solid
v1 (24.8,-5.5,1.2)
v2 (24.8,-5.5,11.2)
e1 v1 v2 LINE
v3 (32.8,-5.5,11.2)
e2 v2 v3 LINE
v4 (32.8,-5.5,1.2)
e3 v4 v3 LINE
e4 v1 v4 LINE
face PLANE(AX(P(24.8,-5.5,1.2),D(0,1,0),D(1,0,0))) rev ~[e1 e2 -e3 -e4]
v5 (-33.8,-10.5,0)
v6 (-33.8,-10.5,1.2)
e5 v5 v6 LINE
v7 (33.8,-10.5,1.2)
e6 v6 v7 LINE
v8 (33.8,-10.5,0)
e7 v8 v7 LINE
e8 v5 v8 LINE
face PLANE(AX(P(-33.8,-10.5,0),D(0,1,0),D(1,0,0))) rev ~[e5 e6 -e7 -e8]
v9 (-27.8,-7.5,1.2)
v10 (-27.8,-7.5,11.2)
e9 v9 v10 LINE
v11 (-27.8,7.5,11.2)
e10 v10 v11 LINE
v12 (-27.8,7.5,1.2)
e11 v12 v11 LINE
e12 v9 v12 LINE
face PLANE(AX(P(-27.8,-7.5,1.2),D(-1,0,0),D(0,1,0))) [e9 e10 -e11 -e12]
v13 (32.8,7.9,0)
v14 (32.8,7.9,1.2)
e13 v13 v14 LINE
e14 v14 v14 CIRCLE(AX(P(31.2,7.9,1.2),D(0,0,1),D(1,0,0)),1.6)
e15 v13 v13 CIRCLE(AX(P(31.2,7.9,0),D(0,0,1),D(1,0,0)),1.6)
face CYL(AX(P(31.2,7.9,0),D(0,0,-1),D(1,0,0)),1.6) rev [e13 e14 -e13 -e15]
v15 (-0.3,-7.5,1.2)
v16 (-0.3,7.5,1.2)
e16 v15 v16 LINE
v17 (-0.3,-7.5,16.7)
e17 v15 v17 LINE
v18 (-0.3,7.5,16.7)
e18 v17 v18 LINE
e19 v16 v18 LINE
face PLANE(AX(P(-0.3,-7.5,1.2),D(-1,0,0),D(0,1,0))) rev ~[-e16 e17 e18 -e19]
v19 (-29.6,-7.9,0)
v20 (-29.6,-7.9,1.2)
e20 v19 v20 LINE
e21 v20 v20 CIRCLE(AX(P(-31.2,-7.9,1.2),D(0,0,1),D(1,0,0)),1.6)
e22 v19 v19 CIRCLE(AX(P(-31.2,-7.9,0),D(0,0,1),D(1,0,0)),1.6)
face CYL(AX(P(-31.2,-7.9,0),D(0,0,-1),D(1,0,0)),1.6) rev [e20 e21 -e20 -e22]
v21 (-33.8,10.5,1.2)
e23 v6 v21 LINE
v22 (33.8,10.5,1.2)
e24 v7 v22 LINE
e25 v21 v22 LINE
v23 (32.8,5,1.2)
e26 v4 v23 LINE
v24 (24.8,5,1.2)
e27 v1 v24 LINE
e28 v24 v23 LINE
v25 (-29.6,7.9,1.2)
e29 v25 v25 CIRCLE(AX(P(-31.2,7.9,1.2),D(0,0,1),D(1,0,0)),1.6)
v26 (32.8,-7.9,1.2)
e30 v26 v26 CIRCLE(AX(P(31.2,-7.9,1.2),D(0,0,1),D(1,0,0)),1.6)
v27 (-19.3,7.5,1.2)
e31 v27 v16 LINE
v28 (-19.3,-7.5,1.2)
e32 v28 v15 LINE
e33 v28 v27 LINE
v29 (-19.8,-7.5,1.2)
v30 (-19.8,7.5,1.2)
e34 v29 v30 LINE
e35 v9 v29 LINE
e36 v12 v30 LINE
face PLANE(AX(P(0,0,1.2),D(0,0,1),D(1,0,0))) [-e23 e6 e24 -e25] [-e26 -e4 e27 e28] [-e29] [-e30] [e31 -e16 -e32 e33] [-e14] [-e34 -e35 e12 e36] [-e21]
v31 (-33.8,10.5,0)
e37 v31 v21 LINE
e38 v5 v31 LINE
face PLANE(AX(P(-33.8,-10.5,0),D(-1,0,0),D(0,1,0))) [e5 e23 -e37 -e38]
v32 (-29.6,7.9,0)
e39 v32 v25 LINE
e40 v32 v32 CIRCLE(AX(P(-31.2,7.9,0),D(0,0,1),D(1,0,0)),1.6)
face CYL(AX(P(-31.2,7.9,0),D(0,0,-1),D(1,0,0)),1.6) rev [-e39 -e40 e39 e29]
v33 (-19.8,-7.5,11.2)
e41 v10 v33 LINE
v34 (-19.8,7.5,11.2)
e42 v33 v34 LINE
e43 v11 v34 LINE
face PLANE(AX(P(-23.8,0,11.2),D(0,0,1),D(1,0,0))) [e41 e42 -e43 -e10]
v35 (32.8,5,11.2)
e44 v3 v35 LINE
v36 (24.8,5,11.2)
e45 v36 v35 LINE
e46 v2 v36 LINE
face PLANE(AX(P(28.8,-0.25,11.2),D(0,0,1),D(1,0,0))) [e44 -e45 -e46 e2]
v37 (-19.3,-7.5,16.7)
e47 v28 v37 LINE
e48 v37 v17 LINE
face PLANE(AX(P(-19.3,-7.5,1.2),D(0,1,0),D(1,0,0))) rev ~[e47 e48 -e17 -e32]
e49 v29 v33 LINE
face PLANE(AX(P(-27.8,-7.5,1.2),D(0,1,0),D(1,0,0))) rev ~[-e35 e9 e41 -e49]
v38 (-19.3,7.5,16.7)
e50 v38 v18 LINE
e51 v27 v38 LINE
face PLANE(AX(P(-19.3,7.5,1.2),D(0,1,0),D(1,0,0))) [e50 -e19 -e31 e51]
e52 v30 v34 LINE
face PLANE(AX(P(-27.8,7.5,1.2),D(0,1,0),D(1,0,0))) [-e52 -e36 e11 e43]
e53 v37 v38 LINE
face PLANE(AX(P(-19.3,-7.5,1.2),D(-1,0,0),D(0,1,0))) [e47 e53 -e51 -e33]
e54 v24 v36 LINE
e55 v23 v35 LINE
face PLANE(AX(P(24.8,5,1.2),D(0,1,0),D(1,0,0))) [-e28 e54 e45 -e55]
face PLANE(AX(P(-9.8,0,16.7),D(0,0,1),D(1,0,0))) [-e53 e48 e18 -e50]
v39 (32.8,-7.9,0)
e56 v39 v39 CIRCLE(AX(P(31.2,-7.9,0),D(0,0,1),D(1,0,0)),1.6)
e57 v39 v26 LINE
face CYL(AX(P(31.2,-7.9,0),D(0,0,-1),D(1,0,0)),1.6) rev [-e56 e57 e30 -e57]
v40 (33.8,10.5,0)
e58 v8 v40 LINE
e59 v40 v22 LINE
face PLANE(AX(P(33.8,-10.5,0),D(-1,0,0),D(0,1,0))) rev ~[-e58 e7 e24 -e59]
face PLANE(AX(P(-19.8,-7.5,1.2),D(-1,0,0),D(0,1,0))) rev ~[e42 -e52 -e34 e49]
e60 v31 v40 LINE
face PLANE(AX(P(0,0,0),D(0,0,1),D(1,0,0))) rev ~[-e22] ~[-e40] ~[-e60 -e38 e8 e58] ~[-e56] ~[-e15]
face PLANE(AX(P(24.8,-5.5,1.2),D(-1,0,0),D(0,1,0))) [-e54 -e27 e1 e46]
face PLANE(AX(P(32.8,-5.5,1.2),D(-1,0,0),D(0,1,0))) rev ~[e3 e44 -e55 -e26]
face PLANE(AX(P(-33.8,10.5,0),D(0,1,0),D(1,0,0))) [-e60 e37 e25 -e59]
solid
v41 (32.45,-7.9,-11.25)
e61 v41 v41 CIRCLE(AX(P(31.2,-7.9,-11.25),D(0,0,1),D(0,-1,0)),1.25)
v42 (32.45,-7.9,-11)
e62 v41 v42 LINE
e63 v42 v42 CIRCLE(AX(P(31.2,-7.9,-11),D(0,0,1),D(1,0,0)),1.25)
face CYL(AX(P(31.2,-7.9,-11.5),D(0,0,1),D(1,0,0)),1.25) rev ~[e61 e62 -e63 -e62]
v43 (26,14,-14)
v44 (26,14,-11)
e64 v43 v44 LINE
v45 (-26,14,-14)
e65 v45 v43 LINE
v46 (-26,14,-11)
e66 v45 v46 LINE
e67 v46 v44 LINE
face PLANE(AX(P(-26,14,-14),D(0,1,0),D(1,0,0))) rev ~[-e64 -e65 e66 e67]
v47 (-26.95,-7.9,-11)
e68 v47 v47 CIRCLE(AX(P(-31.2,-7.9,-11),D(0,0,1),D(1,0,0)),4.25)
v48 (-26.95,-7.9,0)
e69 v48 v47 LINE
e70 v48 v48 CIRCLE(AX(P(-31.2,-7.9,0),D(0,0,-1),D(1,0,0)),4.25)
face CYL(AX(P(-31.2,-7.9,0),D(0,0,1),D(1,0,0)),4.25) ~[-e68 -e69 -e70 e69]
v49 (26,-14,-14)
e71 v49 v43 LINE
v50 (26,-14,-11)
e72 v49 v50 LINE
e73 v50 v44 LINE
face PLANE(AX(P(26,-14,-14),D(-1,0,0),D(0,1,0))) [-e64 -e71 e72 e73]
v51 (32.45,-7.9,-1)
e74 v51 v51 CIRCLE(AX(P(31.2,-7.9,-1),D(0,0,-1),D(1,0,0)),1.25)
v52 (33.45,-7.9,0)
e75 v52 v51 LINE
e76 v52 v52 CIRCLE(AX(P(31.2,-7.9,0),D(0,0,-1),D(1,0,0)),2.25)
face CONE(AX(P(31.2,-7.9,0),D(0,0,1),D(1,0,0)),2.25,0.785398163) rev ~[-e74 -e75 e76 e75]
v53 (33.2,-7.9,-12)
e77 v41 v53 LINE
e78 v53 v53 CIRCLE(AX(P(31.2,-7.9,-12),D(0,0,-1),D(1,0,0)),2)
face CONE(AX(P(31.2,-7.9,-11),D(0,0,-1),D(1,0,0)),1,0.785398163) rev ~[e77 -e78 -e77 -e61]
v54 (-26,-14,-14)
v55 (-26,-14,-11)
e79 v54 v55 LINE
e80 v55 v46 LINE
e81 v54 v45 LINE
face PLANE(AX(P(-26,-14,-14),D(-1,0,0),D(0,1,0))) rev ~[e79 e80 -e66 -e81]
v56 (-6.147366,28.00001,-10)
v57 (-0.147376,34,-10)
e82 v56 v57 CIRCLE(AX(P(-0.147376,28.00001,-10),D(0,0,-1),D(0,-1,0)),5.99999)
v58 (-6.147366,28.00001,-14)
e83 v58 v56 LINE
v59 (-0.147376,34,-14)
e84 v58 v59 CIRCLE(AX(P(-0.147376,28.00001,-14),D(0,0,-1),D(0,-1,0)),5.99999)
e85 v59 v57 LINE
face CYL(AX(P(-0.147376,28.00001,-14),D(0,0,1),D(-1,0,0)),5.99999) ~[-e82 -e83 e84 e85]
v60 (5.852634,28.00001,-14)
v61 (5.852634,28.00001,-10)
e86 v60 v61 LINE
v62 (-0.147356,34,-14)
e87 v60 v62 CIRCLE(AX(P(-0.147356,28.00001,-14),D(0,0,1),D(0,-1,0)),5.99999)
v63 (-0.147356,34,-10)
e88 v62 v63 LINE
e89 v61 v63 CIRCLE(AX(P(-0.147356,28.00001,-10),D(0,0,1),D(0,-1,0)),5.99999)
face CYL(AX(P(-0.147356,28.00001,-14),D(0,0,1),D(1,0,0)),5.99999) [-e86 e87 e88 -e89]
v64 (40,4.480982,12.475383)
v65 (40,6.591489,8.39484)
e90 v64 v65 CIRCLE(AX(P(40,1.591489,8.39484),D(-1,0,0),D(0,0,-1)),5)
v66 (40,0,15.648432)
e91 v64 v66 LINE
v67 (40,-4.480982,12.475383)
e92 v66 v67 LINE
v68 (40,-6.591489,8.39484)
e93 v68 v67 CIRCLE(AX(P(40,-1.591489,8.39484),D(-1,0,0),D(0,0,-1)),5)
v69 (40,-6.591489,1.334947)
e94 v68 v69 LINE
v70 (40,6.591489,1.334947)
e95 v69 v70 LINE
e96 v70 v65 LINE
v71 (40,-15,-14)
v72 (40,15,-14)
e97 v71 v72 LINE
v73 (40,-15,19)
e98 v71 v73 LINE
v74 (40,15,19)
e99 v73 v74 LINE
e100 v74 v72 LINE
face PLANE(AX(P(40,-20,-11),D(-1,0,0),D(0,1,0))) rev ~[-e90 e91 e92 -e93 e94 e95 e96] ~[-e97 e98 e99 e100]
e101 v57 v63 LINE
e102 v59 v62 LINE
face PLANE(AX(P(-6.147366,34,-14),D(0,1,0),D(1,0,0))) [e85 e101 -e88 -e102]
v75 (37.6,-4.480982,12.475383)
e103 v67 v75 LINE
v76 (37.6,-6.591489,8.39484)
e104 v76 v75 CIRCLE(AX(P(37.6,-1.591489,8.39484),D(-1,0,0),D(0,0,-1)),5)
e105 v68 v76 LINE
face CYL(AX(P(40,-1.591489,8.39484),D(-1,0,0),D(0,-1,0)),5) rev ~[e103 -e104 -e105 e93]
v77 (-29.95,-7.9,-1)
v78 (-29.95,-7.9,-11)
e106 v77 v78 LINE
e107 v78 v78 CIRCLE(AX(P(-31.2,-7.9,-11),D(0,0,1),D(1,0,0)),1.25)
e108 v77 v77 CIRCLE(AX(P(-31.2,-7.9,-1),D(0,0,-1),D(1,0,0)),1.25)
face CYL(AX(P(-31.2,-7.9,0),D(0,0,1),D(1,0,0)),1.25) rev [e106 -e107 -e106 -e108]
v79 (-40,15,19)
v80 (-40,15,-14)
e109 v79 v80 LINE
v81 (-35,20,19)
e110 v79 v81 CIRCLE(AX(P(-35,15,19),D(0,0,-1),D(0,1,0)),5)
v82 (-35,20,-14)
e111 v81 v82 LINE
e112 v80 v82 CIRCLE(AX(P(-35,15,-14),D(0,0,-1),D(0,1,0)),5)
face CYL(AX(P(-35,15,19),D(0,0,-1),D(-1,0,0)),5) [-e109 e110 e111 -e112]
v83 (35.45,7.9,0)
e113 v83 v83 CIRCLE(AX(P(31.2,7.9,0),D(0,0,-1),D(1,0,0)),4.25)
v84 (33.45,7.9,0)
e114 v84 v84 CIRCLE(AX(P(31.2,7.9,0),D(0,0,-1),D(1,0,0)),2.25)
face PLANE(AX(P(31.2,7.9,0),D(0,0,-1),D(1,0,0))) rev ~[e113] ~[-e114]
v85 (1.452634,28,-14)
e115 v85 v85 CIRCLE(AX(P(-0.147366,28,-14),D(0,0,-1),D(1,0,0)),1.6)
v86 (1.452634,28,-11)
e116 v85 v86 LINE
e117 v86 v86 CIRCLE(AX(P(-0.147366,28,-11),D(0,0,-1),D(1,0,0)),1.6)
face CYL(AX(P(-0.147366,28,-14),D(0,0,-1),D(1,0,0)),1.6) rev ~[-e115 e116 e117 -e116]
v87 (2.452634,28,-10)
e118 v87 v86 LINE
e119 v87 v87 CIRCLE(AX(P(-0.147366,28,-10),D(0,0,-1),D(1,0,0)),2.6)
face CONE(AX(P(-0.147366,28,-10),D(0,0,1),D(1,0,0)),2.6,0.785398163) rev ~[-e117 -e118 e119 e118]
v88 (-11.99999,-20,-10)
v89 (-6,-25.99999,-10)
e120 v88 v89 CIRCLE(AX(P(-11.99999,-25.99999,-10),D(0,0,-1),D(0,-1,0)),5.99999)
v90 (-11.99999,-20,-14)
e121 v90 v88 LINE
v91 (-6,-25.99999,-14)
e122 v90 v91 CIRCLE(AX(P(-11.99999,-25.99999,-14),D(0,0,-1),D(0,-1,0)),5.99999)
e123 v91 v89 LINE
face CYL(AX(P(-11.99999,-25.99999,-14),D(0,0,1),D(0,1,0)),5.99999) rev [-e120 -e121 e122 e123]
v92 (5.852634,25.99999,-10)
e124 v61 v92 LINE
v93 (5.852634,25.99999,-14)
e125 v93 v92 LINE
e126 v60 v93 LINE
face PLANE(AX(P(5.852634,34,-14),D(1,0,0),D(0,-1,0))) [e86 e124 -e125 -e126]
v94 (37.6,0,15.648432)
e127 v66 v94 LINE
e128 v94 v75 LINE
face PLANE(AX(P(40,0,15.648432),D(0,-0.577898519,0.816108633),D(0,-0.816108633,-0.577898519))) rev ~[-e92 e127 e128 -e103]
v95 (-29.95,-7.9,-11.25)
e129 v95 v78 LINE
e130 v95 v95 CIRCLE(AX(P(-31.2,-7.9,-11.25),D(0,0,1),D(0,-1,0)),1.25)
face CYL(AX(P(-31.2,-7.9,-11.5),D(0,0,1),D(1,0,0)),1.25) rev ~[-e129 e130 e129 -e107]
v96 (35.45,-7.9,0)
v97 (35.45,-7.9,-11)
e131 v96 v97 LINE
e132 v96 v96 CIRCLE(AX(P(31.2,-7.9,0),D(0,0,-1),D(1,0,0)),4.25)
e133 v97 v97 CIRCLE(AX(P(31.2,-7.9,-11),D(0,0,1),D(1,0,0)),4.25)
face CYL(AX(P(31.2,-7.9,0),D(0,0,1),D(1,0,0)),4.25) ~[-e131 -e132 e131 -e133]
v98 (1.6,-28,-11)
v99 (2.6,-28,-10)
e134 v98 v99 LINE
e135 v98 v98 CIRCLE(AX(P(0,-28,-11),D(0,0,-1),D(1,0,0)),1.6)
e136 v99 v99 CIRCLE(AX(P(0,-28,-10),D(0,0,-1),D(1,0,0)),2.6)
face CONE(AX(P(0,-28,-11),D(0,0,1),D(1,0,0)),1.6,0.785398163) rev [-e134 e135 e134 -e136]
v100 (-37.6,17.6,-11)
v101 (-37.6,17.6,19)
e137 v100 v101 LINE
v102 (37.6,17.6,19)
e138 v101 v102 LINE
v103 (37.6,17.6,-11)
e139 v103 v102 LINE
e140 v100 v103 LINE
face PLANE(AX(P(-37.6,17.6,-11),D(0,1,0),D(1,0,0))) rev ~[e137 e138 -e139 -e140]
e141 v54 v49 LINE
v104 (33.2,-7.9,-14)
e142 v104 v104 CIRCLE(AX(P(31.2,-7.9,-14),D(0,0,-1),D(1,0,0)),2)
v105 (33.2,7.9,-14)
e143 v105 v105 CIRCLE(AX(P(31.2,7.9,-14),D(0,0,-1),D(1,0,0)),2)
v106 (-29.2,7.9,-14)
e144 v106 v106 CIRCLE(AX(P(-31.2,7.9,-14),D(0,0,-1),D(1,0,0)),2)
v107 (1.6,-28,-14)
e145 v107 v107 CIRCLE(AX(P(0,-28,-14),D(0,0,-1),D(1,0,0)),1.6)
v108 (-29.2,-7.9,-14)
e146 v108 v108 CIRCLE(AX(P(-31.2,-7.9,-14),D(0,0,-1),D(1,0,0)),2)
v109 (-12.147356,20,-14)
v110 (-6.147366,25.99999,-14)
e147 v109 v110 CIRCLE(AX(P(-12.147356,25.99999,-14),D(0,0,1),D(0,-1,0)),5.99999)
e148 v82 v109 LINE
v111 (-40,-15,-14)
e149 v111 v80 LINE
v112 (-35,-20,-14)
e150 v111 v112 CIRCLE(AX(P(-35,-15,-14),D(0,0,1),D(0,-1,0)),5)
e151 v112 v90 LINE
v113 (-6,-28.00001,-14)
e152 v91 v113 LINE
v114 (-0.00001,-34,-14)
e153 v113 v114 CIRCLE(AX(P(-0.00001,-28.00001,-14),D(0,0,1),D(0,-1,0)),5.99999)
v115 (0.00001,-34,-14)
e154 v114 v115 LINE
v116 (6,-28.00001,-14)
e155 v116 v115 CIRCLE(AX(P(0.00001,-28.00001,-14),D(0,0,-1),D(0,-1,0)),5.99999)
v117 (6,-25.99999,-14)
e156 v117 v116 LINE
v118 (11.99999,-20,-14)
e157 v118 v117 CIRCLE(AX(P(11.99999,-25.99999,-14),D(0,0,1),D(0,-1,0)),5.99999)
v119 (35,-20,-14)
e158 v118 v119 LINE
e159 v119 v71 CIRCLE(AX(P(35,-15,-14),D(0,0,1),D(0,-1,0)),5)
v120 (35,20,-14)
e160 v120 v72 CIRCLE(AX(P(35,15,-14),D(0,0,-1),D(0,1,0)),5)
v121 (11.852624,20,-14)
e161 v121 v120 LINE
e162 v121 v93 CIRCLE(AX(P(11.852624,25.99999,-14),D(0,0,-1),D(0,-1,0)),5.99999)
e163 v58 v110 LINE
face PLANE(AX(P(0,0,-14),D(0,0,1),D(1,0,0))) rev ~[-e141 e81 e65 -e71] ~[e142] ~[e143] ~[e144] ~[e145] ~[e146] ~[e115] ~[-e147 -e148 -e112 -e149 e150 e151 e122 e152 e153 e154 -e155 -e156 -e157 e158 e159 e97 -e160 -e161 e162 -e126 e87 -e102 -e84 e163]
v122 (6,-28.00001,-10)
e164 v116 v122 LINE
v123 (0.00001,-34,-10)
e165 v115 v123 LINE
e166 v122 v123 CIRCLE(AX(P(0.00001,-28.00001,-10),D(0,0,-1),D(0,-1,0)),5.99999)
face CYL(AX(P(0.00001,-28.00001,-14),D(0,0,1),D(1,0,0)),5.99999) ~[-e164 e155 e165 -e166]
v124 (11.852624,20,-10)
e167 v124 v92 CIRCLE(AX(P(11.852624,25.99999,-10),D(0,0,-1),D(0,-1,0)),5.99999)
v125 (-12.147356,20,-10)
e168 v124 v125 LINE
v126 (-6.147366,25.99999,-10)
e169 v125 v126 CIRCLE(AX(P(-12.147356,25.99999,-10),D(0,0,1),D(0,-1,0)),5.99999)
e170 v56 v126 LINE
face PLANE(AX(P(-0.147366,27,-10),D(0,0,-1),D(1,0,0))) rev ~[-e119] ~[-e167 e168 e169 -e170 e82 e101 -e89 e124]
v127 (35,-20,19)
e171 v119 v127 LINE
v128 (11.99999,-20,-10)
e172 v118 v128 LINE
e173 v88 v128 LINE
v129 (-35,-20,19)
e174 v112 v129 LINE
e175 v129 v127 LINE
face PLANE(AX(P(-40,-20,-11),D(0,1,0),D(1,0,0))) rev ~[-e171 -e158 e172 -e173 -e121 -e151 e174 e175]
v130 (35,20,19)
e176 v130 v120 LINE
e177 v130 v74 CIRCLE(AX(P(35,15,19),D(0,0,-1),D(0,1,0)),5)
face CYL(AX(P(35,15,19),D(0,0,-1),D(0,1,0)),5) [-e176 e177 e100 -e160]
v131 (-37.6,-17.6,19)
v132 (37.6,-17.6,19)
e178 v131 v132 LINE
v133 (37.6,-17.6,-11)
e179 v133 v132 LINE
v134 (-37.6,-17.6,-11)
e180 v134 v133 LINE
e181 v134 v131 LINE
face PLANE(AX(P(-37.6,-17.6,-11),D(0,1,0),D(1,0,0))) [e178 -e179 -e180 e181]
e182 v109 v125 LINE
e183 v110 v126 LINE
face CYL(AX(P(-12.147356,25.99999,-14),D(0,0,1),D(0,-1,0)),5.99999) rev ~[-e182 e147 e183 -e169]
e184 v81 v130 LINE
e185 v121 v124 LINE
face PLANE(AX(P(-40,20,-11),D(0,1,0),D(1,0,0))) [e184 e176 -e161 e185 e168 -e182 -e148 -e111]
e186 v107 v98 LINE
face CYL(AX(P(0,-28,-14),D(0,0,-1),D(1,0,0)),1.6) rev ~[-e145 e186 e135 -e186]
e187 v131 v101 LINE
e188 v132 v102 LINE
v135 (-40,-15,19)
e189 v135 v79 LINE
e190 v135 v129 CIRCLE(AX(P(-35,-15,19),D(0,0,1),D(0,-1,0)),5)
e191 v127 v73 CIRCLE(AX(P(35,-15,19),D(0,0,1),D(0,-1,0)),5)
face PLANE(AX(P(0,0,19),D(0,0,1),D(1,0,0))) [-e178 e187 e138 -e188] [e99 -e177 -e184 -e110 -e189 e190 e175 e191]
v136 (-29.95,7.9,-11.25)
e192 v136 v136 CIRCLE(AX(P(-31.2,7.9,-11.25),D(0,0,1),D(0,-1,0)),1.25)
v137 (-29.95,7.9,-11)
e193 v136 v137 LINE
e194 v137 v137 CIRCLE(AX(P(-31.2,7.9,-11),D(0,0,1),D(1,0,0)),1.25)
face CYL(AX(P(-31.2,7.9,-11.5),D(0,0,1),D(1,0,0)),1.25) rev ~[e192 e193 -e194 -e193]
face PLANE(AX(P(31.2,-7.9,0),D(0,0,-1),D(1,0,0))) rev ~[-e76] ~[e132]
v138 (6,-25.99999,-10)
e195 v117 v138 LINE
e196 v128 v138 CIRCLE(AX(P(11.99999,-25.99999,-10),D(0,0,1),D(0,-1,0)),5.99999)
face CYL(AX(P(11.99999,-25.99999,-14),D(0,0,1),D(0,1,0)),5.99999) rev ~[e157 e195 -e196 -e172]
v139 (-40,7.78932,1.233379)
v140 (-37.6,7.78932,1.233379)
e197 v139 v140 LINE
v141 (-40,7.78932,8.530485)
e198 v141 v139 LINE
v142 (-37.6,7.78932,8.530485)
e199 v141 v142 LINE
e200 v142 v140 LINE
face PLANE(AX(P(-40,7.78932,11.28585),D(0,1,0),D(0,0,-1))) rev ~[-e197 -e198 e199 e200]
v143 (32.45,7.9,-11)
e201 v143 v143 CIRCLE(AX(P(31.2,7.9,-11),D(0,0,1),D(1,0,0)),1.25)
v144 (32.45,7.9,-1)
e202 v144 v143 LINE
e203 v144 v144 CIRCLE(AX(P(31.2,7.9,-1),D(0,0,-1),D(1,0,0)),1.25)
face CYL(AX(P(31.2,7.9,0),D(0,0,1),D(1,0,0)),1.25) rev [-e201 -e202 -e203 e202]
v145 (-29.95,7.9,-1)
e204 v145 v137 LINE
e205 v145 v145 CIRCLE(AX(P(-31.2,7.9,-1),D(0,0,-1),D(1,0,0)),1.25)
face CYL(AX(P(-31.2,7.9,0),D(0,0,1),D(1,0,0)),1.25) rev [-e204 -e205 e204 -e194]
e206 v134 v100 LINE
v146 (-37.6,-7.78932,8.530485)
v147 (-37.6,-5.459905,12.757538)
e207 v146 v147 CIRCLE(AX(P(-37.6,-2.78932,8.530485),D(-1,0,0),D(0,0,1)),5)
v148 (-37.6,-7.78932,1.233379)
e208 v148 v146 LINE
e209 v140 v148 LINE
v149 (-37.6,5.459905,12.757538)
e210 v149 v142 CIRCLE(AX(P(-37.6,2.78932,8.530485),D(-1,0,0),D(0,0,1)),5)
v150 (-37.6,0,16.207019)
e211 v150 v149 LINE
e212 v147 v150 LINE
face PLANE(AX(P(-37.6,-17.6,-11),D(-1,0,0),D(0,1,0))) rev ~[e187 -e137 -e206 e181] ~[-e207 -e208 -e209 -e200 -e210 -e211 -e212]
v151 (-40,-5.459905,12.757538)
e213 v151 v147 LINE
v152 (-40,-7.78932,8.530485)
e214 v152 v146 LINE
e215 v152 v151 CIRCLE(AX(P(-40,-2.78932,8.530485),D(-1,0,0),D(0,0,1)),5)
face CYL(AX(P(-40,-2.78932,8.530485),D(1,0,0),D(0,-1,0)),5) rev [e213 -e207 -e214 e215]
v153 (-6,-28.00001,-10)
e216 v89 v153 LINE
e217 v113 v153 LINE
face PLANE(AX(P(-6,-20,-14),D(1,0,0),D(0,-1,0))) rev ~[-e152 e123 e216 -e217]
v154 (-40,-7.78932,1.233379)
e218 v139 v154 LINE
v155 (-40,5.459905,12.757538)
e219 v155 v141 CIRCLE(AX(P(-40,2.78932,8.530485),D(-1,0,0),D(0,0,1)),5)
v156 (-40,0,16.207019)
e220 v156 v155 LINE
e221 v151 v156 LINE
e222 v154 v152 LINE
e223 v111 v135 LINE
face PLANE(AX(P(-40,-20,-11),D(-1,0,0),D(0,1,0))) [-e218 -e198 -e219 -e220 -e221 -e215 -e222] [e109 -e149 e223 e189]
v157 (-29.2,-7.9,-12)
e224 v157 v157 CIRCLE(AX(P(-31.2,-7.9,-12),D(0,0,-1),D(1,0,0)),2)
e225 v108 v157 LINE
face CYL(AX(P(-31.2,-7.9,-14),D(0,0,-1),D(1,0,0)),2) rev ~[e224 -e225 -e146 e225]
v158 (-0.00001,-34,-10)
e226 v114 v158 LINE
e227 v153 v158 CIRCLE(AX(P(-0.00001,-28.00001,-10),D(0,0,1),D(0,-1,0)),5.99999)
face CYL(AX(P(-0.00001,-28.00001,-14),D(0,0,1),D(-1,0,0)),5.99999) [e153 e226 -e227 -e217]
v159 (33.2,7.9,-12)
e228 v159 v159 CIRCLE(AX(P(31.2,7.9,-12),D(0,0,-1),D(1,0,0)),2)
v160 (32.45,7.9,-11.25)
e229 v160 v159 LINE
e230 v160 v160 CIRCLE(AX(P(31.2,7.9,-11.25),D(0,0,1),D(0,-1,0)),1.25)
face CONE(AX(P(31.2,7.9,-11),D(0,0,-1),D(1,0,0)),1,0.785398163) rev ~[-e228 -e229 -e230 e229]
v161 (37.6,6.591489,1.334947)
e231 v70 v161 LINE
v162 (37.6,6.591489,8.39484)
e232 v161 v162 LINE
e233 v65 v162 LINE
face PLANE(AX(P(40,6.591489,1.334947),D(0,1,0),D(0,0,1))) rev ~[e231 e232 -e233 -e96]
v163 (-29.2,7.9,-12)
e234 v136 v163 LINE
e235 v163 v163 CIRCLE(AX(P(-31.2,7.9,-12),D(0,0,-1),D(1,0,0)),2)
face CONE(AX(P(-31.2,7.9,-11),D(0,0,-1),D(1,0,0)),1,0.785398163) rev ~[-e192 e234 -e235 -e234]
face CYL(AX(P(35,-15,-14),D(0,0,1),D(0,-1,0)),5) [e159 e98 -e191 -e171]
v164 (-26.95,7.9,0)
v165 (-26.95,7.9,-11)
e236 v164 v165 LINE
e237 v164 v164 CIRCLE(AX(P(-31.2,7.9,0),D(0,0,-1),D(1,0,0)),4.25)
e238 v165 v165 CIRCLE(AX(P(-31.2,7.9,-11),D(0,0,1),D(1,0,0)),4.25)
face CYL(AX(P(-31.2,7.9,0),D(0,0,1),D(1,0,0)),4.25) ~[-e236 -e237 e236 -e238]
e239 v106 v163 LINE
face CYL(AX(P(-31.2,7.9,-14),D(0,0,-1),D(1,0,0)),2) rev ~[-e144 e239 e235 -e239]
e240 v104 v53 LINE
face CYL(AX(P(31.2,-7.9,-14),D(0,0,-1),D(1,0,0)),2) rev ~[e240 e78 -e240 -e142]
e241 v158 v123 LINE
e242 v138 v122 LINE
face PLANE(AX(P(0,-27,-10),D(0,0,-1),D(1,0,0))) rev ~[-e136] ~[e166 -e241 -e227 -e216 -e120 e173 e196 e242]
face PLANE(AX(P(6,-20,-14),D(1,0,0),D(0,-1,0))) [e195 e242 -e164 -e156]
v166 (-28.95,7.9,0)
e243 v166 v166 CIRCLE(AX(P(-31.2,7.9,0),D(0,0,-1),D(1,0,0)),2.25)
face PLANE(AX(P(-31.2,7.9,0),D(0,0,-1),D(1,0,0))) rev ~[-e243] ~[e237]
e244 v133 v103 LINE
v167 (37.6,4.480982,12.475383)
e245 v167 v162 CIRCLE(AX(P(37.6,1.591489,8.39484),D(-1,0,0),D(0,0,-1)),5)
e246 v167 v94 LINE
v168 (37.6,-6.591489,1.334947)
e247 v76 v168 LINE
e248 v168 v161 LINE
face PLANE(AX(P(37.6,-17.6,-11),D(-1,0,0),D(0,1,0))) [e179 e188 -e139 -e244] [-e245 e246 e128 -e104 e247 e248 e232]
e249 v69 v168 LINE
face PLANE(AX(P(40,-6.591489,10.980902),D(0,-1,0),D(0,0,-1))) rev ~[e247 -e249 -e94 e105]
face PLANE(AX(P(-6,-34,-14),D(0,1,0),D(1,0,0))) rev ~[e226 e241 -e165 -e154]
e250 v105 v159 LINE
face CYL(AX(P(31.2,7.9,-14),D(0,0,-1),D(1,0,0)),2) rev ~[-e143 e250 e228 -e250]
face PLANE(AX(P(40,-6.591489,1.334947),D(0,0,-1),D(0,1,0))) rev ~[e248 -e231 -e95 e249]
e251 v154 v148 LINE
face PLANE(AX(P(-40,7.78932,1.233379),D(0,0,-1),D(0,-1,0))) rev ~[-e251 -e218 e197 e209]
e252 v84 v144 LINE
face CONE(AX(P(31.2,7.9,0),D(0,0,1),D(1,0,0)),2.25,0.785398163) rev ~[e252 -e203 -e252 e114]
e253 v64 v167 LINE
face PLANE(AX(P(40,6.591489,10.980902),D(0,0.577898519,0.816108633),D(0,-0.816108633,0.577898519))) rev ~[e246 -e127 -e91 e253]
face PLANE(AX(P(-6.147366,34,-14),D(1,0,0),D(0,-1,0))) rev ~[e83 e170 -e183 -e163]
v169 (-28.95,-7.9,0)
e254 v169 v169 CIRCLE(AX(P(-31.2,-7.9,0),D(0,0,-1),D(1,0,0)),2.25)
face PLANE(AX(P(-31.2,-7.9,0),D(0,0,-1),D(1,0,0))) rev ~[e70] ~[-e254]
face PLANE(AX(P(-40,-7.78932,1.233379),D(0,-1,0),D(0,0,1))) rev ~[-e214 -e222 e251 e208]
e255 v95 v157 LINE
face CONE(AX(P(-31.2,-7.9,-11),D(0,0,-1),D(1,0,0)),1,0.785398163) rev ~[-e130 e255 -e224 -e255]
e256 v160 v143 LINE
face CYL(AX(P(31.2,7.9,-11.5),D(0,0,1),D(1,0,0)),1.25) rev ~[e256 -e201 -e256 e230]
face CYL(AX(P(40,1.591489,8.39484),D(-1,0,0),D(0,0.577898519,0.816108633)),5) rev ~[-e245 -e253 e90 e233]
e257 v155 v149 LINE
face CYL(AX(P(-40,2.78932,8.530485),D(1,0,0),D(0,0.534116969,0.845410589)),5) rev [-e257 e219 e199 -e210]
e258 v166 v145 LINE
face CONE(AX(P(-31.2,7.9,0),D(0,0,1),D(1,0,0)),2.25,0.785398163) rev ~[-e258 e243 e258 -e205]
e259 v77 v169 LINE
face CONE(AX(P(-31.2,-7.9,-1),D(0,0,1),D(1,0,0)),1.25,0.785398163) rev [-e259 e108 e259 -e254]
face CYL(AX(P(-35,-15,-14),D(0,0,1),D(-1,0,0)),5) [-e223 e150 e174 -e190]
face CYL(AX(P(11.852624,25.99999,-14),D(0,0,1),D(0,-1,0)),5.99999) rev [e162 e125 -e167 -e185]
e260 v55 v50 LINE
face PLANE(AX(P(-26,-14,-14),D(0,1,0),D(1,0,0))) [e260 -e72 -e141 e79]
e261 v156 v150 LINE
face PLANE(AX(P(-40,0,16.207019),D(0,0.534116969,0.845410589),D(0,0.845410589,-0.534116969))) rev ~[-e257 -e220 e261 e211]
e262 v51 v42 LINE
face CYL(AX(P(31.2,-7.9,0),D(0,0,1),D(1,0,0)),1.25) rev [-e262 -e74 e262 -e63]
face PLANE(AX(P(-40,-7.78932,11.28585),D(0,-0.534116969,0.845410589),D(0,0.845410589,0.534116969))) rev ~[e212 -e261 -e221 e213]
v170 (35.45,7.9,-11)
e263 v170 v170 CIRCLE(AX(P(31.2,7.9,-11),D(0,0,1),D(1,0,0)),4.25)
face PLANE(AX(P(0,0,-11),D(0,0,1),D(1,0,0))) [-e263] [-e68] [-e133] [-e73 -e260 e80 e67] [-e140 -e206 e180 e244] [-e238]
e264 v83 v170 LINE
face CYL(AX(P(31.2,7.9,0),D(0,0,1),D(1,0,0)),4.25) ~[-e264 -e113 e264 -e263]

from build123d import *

# Parameters (mm, degrees)
F1_W          = 67.6
F1_H          = 21
F1_R          = 1.6
F2_DEPTH      = 1.2
F3_W          = 80
F3_H          = 40
F3_W_2        = 52
F3_H_2        = 28
F4_DEPTH      = 3
F5_R          = 4.25
F5_R_2        = 1.25
F6_DEPTH      = 14
F7_W          = 8
F7_H          = 15
F7_H_2        = 10.5
F8_DEPTH      = 10
F9_W          = 19
F9_H          = 15
F10_DEPTH     = 15.5
F11_W         = 80
F11_H         = 40
F11_W_2       = 75.2
F11_H_2       = 35.2
F12_DEPTH     = 30
F14_DEPTH     = 2.4
F16_DEPTH     = 2.4
F17_R         = 5
F18_W         = 12
F18_H         = 14
F18_R         = 1.6
F19_DEPTH     = 4
F20_R         = 5.99999
F21_R         = 2
F22_DEPTH     = 3
F23_S5_R      = 1.25
F23_T6_DEPTH  = 4
F23_S11_R     = 1.25
F23_T12_DEPTH = 4
F23_S17_R     = 1.25
F23_T18_DEPTH = 4
F23_S23_R     = 1.25
F23_T24_DEPTH = 4


# Not quite as in the source:
# - a fillet or chamfer that OpenCascade refuses, or shapes differently, is made with other operations: its cross-section is extruded or revolved along the edge and cut away or added
# - a fillet or chamfer is up to 0.001 mm smaller than in the source, because OpenCascade refuses the exact size


with BuildPart() as f2:
    # F1 (on Top) → F2 (new body)
    with BuildSketch(Plane.XY):
        Rectangle(F1_W, F1_H)
        with Locations((-31.2, -7.9)):
            Circle(F1_R, mode=Mode.SUBTRACT)
        with Locations((31.2, -7.9)):
            Circle(F1_R, mode=Mode.SUBTRACT)
        with Locations((-31.2, 7.9)):
            Circle(F1_R, mode=Mode.SUBTRACT)
        with Locations((31.2, 7.9)):
            Circle(F1_R, mode=Mode.SUBTRACT)
    extrude(amount=F2_DEPTH)

    # F7 (on face) → F8 (join)
    with BuildSketch(Plane.XY.offset(1.2)):
        with Locations((-23.8, 0)):
            Rectangle(F7_W, F7_H)
        with Locations((28.8, -0.25)):
            Rectangle(F7_W, F7_H_2)
    extrude(amount=F8_DEPTH)

    # F9 (on face) → F10 (join)
    with BuildSketch(Plane.XY.offset(1.2)):
        with Locations((-9.8, 0)):
            Rectangle(F9_W, F9_H)
    extrude(amount=F10_DEPTH)


with BuildPart() as f4:
    # F3 (on offset) → F4 (new body)
    with BuildSketch(Plane.XY.offset(-14)):
        Rectangle(F3_W, F3_H)
        Rectangle(F3_W_2, F3_H_2, mode=Mode.SUBTRACT)
    extrude(amount=F4_DEPTH)

    # F5 (on face) → F6 (join)
    with BuildSketch(Plane(origin=(0, 0, 0), x_dir=(1, 0, 0), z_dir=(0, 0, -1))):
        with Locations((-31.2, 7.9)):
            Circle(F5_R)
        with Locations((-31.2, 7.9)):
            Circle(F5_R_2, mode=Mode.SUBTRACT)
        with Locations((-31.2, -7.9)):
            Circle(F5_R)
        with Locations((-31.2, -7.9)):
            Circle(F5_R_2, mode=Mode.SUBTRACT)
        with Locations((31.2, 7.9)):
            Circle(F5_R)
        with Locations((31.2, 7.9)):
            Circle(F5_R_2, mode=Mode.SUBTRACT)
        with Locations((31.2, -7.9)):
            Circle(F5_R)
        with Locations((31.2, -7.9)):
            Circle(F5_R_2, mode=Mode.SUBTRACT)
    extrude(amount=F6_DEPTH)

    # F11 (on face) → F12 (join)
    with BuildSketch(Plane.XY.offset(-11)):
        Rectangle(F11_W, F11_H)
        Rectangle(F11_W_2, F11_H_2, mode=Mode.SUBTRACT)
    extrude(amount=F12_DEPTH)

    # F13 (on face) → F14 (cut, through all)
    with BuildSketch(Plane(origin=(-40, 0, 0), x_dir=(0, -1, 0), z_dir=(-1, 0, 0))):
        Polygon((-7.7893198468, 1.2333787745), (7.7893198468, 1.2333787745), (7.7893198468, 11.285850429), (0, 16.2070188671), (-7.7893198468, 11.285850429), align=None)
    extrude(amount=-F14_DEPTH, mode=Mode.SUBTRACT)

    # F15 (on face) → F16 (cut, through all)
    with BuildSketch(Plane.YZ.offset(40)):
        Polygon((-6.5914890729, 1.3349470682), (6.5914890729, 1.3349470682), (6.5914890729, 10.980901774), (0, 15.648432076), (-6.5914890729, 10.980901774), align=None)
    extrude(amount=-F16_DEPTH, mode=Mode.SUBTRACT)

    # F17
    f17_edges = [f4.edges().sort_by_distance(p)[0] for p in [
        (38.8, 6.591489, 10.980902),
        (-38.8, -7.78932, 11.28585),
        (-38.8, 7.78932, 11.28585),
        (38.8, -6.591489, 10.980902),
        (40, -20, 2.5),
        (40, 20, 2.5),
        (-40, 20, 2.5),
        (-40, -20, 2.5),
    ]]
    fillet(f17_edges, radius=F17_R)

    # F18 (on face) → F19 (join)
    with BuildSketch(Plane(origin=(0, 0, -14), x_dir=(1, 0, 0), z_dir=(0, 0, -1))):
        with Locations((0, 27)):
            Rectangle(F18_W, F18_H)
        with Locations((0, 28)):
            Circle(F18_R, mode=Mode.SUBTRACT)
        with Locations((-0.1473658485, -27)):
            Rectangle(F18_W, F18_H)
        with Locations((-0.1473658485, -28)):
            Circle(F18_R, mode=Mode.SUBTRACT)
    extrude(amount=-F19_DEPTH)

    # F20 (radius 6 in the source; OpenCascade refuses exactly that, so slightly less here)
    f20_edges = [f4.edges().sort_by_distance(p)[0] for p in [
        (6, -34, -12),
        (-6, -34, -12),
        (5.852634, 34, -12),
        (-6.147366, 34, -12),
        (5.852634, 20, -12),
        (-6.147366, 20, -12),
        (6, -20, -12),
        (-6, -20, -12),
    ]]
    fillet(f20_edges, radius=F20_R)

    # F21 (on face) → F22 (cut)
    with BuildSketch(Plane(origin=(0, 0, -14), x_dir=(1, 0, 0), z_dir=(0, 0, -1))):
        with Locations((-31.2, -7.9)):
            Circle(F21_R)
        with Locations((-31.2, 7.9)):
            Circle(F21_R)
        with Locations((31.2, -7.9)):
            Circle(F21_R)
        with Locations((31.2, 7.9)):
            Circle(F21_R)
    extrude(amount=-F22_DEPTH, mode=Mode.SUBTRACT)

    # F23: chamfer of 1 on 10 edges, made by hand


with BuildPart() as f23_tool2:
    # F23_s3 → F23_t4 (revolve)
    with BuildSketch(Plane.XZ.offset(-7.9)):
        Polygon((32.2, -11), (33.2, -12), (33.2, -11), align=None)
    revolve(axis=Axis((31.2, 7.9, -11), (0, 0, -1)))

    # F23_s5 → F23_t6 (cut, symmetric)
    with BuildSketch(Plane.XY.offset(-11.5)):
        with Locations((31.2, 7.9)):
            Circle(F23_S5_R)
    extrude(amount=F23_T6_DEPTH, both=True, mode=Mode.SUBTRACT)


with BuildPart() as f4_1:
    add(f4.part)

    # F23_t1: union F23_tool2
    add(f23_tool2.part)


with BuildPart() as f23_tool8:
    # F23_s9 → F23_t10 (revolve)
    with BuildSketch(Plane.XZ.offset(7.9)):
        Polygon((32.2, -11), (33.2, -12), (33.2, -11), align=None)
    revolve(axis=Axis((31.2, -7.9, -11), (0, 0, -1)))

    # F23_s11 → F23_t12 (cut, symmetric)
    with BuildSketch(Plane.XY.offset(-11.5)):
        with Locations((31.2, -7.9)):
            Circle(F23_S11_R)
    extrude(amount=F23_T12_DEPTH, both=True, mode=Mode.SUBTRACT)


with BuildPart() as f4_2:
    add(f4_1.part)

    # F23_t7: union F23_tool8
    add(f23_tool8.part)


with BuildPart() as f23_tool14:
    # F23_s15 → F23_t16 (revolve)
    with BuildSketch(Plane.XZ.offset(7.9)):
        Polygon((-30.2, -11), (-29.2, -12), (-29.2, -11), align=None)
    revolve(axis=Axis((-31.2, -7.9, -11), (0, 0, -1)))

    # F23_s17 → F23_t18 (cut, symmetric)
    with BuildSketch(Plane.XY.offset(-11.5)):
        with Locations((-31.2, -7.9)):
            Circle(F23_S17_R)
    extrude(amount=F23_T18_DEPTH, both=True, mode=Mode.SUBTRACT)


with BuildPart() as f4_3:
    add(f4_2.part)

    # F23_t13: union F23_tool14
    add(f23_tool14.part)


with BuildPart() as f23_tool20:
    # F23_s21 → F23_t22 (revolve)
    with BuildSketch(Plane.XZ.offset(-7.9)):
        Polygon((-30.2, -11), (-29.2, -12), (-29.2, -11), align=None)
    revolve(axis=Axis((-31.2, 7.9, -11), (0, 0, -1)))

    # F23_s23 → F23_t24 (cut, symmetric)
    with BuildSketch(Plane.XY.offset(-11.5)):
        with Locations((-31.2, 7.9)):
            Circle(F23_S23_R)
    extrude(amount=F23_T24_DEPTH, both=True, mode=Mode.SUBTRACT)


with BuildPart() as f4_4:
    add(f4_3.part)

    # F23_t19: union F23_tool20
    add(f23_tool20.part)

    # F23_s25 → F23_t26 (revolve, cut)
    with BuildSketch(Plane.XZ.offset(7.9)):
        Polygon((-29.95, -1), (-28.95, 0), (-29.95, 0), align=None)
    revolve(axis=Axis((-31.2, -7.9, 0), (0, 0, -1)), mode=Mode.SUBTRACT)

    # F23_s27 → F23_t28 (revolve, cut)
    with BuildSketch(Plane.XZ.offset(-7.9)):
        Polygon((-28.95, 0), (-29.95, -1), (-29.95, 0), align=None)
    revolve(axis=Axis((-31.2, 7.9, 0), (0, 0, -1)), mode=Mode.SUBTRACT)

    # F23_s29 → F23_t30 (revolve, cut)
    with BuildSketch(Plane.XZ.offset(7.9)):
        Polygon((33.45, 0), (32.45, -1), (32.45, 0), align=None)
    revolve(axis=Axis((31.2, -7.9, 0), (0, 0, -1)), mode=Mode.SUBTRACT)

    # F23_s31 → F23_t32 (revolve, cut)
    with BuildSketch(Plane.XZ.offset(-7.9)):
        Polygon((33.45, 0), (32.45, -1), (32.45, 0), align=None)
    revolve(axis=Axis((31.2, 7.9, 0), (0, 0, -1)), mode=Mode.SUBTRACT)

    # F23_s33 → F23_t34 (revolve, cut)
    with BuildSketch(Plane.XZ.offset(28)):
        Polygon((1.6, -11), (2.6, -10), (1.6, -10), align=None)
    revolve(axis=Axis((0, -28, -10), (0, 0, -1)), mode=Mode.SUBTRACT)

    # F23_s35 → F23_t36 (revolve, cut)
    with BuildSketch(Plane.XZ.offset(-28)):
        Polygon((2.4526341515, -10), (1.4526341515, -11), (1.4526341515, -10), align=None)
    revolve(axis=Axis((-0.1473658485, 28, -10), (0, 0, -1)), mode=Mode.SUBTRACT)


solid = Compound([f2.part, f4_4.part])
